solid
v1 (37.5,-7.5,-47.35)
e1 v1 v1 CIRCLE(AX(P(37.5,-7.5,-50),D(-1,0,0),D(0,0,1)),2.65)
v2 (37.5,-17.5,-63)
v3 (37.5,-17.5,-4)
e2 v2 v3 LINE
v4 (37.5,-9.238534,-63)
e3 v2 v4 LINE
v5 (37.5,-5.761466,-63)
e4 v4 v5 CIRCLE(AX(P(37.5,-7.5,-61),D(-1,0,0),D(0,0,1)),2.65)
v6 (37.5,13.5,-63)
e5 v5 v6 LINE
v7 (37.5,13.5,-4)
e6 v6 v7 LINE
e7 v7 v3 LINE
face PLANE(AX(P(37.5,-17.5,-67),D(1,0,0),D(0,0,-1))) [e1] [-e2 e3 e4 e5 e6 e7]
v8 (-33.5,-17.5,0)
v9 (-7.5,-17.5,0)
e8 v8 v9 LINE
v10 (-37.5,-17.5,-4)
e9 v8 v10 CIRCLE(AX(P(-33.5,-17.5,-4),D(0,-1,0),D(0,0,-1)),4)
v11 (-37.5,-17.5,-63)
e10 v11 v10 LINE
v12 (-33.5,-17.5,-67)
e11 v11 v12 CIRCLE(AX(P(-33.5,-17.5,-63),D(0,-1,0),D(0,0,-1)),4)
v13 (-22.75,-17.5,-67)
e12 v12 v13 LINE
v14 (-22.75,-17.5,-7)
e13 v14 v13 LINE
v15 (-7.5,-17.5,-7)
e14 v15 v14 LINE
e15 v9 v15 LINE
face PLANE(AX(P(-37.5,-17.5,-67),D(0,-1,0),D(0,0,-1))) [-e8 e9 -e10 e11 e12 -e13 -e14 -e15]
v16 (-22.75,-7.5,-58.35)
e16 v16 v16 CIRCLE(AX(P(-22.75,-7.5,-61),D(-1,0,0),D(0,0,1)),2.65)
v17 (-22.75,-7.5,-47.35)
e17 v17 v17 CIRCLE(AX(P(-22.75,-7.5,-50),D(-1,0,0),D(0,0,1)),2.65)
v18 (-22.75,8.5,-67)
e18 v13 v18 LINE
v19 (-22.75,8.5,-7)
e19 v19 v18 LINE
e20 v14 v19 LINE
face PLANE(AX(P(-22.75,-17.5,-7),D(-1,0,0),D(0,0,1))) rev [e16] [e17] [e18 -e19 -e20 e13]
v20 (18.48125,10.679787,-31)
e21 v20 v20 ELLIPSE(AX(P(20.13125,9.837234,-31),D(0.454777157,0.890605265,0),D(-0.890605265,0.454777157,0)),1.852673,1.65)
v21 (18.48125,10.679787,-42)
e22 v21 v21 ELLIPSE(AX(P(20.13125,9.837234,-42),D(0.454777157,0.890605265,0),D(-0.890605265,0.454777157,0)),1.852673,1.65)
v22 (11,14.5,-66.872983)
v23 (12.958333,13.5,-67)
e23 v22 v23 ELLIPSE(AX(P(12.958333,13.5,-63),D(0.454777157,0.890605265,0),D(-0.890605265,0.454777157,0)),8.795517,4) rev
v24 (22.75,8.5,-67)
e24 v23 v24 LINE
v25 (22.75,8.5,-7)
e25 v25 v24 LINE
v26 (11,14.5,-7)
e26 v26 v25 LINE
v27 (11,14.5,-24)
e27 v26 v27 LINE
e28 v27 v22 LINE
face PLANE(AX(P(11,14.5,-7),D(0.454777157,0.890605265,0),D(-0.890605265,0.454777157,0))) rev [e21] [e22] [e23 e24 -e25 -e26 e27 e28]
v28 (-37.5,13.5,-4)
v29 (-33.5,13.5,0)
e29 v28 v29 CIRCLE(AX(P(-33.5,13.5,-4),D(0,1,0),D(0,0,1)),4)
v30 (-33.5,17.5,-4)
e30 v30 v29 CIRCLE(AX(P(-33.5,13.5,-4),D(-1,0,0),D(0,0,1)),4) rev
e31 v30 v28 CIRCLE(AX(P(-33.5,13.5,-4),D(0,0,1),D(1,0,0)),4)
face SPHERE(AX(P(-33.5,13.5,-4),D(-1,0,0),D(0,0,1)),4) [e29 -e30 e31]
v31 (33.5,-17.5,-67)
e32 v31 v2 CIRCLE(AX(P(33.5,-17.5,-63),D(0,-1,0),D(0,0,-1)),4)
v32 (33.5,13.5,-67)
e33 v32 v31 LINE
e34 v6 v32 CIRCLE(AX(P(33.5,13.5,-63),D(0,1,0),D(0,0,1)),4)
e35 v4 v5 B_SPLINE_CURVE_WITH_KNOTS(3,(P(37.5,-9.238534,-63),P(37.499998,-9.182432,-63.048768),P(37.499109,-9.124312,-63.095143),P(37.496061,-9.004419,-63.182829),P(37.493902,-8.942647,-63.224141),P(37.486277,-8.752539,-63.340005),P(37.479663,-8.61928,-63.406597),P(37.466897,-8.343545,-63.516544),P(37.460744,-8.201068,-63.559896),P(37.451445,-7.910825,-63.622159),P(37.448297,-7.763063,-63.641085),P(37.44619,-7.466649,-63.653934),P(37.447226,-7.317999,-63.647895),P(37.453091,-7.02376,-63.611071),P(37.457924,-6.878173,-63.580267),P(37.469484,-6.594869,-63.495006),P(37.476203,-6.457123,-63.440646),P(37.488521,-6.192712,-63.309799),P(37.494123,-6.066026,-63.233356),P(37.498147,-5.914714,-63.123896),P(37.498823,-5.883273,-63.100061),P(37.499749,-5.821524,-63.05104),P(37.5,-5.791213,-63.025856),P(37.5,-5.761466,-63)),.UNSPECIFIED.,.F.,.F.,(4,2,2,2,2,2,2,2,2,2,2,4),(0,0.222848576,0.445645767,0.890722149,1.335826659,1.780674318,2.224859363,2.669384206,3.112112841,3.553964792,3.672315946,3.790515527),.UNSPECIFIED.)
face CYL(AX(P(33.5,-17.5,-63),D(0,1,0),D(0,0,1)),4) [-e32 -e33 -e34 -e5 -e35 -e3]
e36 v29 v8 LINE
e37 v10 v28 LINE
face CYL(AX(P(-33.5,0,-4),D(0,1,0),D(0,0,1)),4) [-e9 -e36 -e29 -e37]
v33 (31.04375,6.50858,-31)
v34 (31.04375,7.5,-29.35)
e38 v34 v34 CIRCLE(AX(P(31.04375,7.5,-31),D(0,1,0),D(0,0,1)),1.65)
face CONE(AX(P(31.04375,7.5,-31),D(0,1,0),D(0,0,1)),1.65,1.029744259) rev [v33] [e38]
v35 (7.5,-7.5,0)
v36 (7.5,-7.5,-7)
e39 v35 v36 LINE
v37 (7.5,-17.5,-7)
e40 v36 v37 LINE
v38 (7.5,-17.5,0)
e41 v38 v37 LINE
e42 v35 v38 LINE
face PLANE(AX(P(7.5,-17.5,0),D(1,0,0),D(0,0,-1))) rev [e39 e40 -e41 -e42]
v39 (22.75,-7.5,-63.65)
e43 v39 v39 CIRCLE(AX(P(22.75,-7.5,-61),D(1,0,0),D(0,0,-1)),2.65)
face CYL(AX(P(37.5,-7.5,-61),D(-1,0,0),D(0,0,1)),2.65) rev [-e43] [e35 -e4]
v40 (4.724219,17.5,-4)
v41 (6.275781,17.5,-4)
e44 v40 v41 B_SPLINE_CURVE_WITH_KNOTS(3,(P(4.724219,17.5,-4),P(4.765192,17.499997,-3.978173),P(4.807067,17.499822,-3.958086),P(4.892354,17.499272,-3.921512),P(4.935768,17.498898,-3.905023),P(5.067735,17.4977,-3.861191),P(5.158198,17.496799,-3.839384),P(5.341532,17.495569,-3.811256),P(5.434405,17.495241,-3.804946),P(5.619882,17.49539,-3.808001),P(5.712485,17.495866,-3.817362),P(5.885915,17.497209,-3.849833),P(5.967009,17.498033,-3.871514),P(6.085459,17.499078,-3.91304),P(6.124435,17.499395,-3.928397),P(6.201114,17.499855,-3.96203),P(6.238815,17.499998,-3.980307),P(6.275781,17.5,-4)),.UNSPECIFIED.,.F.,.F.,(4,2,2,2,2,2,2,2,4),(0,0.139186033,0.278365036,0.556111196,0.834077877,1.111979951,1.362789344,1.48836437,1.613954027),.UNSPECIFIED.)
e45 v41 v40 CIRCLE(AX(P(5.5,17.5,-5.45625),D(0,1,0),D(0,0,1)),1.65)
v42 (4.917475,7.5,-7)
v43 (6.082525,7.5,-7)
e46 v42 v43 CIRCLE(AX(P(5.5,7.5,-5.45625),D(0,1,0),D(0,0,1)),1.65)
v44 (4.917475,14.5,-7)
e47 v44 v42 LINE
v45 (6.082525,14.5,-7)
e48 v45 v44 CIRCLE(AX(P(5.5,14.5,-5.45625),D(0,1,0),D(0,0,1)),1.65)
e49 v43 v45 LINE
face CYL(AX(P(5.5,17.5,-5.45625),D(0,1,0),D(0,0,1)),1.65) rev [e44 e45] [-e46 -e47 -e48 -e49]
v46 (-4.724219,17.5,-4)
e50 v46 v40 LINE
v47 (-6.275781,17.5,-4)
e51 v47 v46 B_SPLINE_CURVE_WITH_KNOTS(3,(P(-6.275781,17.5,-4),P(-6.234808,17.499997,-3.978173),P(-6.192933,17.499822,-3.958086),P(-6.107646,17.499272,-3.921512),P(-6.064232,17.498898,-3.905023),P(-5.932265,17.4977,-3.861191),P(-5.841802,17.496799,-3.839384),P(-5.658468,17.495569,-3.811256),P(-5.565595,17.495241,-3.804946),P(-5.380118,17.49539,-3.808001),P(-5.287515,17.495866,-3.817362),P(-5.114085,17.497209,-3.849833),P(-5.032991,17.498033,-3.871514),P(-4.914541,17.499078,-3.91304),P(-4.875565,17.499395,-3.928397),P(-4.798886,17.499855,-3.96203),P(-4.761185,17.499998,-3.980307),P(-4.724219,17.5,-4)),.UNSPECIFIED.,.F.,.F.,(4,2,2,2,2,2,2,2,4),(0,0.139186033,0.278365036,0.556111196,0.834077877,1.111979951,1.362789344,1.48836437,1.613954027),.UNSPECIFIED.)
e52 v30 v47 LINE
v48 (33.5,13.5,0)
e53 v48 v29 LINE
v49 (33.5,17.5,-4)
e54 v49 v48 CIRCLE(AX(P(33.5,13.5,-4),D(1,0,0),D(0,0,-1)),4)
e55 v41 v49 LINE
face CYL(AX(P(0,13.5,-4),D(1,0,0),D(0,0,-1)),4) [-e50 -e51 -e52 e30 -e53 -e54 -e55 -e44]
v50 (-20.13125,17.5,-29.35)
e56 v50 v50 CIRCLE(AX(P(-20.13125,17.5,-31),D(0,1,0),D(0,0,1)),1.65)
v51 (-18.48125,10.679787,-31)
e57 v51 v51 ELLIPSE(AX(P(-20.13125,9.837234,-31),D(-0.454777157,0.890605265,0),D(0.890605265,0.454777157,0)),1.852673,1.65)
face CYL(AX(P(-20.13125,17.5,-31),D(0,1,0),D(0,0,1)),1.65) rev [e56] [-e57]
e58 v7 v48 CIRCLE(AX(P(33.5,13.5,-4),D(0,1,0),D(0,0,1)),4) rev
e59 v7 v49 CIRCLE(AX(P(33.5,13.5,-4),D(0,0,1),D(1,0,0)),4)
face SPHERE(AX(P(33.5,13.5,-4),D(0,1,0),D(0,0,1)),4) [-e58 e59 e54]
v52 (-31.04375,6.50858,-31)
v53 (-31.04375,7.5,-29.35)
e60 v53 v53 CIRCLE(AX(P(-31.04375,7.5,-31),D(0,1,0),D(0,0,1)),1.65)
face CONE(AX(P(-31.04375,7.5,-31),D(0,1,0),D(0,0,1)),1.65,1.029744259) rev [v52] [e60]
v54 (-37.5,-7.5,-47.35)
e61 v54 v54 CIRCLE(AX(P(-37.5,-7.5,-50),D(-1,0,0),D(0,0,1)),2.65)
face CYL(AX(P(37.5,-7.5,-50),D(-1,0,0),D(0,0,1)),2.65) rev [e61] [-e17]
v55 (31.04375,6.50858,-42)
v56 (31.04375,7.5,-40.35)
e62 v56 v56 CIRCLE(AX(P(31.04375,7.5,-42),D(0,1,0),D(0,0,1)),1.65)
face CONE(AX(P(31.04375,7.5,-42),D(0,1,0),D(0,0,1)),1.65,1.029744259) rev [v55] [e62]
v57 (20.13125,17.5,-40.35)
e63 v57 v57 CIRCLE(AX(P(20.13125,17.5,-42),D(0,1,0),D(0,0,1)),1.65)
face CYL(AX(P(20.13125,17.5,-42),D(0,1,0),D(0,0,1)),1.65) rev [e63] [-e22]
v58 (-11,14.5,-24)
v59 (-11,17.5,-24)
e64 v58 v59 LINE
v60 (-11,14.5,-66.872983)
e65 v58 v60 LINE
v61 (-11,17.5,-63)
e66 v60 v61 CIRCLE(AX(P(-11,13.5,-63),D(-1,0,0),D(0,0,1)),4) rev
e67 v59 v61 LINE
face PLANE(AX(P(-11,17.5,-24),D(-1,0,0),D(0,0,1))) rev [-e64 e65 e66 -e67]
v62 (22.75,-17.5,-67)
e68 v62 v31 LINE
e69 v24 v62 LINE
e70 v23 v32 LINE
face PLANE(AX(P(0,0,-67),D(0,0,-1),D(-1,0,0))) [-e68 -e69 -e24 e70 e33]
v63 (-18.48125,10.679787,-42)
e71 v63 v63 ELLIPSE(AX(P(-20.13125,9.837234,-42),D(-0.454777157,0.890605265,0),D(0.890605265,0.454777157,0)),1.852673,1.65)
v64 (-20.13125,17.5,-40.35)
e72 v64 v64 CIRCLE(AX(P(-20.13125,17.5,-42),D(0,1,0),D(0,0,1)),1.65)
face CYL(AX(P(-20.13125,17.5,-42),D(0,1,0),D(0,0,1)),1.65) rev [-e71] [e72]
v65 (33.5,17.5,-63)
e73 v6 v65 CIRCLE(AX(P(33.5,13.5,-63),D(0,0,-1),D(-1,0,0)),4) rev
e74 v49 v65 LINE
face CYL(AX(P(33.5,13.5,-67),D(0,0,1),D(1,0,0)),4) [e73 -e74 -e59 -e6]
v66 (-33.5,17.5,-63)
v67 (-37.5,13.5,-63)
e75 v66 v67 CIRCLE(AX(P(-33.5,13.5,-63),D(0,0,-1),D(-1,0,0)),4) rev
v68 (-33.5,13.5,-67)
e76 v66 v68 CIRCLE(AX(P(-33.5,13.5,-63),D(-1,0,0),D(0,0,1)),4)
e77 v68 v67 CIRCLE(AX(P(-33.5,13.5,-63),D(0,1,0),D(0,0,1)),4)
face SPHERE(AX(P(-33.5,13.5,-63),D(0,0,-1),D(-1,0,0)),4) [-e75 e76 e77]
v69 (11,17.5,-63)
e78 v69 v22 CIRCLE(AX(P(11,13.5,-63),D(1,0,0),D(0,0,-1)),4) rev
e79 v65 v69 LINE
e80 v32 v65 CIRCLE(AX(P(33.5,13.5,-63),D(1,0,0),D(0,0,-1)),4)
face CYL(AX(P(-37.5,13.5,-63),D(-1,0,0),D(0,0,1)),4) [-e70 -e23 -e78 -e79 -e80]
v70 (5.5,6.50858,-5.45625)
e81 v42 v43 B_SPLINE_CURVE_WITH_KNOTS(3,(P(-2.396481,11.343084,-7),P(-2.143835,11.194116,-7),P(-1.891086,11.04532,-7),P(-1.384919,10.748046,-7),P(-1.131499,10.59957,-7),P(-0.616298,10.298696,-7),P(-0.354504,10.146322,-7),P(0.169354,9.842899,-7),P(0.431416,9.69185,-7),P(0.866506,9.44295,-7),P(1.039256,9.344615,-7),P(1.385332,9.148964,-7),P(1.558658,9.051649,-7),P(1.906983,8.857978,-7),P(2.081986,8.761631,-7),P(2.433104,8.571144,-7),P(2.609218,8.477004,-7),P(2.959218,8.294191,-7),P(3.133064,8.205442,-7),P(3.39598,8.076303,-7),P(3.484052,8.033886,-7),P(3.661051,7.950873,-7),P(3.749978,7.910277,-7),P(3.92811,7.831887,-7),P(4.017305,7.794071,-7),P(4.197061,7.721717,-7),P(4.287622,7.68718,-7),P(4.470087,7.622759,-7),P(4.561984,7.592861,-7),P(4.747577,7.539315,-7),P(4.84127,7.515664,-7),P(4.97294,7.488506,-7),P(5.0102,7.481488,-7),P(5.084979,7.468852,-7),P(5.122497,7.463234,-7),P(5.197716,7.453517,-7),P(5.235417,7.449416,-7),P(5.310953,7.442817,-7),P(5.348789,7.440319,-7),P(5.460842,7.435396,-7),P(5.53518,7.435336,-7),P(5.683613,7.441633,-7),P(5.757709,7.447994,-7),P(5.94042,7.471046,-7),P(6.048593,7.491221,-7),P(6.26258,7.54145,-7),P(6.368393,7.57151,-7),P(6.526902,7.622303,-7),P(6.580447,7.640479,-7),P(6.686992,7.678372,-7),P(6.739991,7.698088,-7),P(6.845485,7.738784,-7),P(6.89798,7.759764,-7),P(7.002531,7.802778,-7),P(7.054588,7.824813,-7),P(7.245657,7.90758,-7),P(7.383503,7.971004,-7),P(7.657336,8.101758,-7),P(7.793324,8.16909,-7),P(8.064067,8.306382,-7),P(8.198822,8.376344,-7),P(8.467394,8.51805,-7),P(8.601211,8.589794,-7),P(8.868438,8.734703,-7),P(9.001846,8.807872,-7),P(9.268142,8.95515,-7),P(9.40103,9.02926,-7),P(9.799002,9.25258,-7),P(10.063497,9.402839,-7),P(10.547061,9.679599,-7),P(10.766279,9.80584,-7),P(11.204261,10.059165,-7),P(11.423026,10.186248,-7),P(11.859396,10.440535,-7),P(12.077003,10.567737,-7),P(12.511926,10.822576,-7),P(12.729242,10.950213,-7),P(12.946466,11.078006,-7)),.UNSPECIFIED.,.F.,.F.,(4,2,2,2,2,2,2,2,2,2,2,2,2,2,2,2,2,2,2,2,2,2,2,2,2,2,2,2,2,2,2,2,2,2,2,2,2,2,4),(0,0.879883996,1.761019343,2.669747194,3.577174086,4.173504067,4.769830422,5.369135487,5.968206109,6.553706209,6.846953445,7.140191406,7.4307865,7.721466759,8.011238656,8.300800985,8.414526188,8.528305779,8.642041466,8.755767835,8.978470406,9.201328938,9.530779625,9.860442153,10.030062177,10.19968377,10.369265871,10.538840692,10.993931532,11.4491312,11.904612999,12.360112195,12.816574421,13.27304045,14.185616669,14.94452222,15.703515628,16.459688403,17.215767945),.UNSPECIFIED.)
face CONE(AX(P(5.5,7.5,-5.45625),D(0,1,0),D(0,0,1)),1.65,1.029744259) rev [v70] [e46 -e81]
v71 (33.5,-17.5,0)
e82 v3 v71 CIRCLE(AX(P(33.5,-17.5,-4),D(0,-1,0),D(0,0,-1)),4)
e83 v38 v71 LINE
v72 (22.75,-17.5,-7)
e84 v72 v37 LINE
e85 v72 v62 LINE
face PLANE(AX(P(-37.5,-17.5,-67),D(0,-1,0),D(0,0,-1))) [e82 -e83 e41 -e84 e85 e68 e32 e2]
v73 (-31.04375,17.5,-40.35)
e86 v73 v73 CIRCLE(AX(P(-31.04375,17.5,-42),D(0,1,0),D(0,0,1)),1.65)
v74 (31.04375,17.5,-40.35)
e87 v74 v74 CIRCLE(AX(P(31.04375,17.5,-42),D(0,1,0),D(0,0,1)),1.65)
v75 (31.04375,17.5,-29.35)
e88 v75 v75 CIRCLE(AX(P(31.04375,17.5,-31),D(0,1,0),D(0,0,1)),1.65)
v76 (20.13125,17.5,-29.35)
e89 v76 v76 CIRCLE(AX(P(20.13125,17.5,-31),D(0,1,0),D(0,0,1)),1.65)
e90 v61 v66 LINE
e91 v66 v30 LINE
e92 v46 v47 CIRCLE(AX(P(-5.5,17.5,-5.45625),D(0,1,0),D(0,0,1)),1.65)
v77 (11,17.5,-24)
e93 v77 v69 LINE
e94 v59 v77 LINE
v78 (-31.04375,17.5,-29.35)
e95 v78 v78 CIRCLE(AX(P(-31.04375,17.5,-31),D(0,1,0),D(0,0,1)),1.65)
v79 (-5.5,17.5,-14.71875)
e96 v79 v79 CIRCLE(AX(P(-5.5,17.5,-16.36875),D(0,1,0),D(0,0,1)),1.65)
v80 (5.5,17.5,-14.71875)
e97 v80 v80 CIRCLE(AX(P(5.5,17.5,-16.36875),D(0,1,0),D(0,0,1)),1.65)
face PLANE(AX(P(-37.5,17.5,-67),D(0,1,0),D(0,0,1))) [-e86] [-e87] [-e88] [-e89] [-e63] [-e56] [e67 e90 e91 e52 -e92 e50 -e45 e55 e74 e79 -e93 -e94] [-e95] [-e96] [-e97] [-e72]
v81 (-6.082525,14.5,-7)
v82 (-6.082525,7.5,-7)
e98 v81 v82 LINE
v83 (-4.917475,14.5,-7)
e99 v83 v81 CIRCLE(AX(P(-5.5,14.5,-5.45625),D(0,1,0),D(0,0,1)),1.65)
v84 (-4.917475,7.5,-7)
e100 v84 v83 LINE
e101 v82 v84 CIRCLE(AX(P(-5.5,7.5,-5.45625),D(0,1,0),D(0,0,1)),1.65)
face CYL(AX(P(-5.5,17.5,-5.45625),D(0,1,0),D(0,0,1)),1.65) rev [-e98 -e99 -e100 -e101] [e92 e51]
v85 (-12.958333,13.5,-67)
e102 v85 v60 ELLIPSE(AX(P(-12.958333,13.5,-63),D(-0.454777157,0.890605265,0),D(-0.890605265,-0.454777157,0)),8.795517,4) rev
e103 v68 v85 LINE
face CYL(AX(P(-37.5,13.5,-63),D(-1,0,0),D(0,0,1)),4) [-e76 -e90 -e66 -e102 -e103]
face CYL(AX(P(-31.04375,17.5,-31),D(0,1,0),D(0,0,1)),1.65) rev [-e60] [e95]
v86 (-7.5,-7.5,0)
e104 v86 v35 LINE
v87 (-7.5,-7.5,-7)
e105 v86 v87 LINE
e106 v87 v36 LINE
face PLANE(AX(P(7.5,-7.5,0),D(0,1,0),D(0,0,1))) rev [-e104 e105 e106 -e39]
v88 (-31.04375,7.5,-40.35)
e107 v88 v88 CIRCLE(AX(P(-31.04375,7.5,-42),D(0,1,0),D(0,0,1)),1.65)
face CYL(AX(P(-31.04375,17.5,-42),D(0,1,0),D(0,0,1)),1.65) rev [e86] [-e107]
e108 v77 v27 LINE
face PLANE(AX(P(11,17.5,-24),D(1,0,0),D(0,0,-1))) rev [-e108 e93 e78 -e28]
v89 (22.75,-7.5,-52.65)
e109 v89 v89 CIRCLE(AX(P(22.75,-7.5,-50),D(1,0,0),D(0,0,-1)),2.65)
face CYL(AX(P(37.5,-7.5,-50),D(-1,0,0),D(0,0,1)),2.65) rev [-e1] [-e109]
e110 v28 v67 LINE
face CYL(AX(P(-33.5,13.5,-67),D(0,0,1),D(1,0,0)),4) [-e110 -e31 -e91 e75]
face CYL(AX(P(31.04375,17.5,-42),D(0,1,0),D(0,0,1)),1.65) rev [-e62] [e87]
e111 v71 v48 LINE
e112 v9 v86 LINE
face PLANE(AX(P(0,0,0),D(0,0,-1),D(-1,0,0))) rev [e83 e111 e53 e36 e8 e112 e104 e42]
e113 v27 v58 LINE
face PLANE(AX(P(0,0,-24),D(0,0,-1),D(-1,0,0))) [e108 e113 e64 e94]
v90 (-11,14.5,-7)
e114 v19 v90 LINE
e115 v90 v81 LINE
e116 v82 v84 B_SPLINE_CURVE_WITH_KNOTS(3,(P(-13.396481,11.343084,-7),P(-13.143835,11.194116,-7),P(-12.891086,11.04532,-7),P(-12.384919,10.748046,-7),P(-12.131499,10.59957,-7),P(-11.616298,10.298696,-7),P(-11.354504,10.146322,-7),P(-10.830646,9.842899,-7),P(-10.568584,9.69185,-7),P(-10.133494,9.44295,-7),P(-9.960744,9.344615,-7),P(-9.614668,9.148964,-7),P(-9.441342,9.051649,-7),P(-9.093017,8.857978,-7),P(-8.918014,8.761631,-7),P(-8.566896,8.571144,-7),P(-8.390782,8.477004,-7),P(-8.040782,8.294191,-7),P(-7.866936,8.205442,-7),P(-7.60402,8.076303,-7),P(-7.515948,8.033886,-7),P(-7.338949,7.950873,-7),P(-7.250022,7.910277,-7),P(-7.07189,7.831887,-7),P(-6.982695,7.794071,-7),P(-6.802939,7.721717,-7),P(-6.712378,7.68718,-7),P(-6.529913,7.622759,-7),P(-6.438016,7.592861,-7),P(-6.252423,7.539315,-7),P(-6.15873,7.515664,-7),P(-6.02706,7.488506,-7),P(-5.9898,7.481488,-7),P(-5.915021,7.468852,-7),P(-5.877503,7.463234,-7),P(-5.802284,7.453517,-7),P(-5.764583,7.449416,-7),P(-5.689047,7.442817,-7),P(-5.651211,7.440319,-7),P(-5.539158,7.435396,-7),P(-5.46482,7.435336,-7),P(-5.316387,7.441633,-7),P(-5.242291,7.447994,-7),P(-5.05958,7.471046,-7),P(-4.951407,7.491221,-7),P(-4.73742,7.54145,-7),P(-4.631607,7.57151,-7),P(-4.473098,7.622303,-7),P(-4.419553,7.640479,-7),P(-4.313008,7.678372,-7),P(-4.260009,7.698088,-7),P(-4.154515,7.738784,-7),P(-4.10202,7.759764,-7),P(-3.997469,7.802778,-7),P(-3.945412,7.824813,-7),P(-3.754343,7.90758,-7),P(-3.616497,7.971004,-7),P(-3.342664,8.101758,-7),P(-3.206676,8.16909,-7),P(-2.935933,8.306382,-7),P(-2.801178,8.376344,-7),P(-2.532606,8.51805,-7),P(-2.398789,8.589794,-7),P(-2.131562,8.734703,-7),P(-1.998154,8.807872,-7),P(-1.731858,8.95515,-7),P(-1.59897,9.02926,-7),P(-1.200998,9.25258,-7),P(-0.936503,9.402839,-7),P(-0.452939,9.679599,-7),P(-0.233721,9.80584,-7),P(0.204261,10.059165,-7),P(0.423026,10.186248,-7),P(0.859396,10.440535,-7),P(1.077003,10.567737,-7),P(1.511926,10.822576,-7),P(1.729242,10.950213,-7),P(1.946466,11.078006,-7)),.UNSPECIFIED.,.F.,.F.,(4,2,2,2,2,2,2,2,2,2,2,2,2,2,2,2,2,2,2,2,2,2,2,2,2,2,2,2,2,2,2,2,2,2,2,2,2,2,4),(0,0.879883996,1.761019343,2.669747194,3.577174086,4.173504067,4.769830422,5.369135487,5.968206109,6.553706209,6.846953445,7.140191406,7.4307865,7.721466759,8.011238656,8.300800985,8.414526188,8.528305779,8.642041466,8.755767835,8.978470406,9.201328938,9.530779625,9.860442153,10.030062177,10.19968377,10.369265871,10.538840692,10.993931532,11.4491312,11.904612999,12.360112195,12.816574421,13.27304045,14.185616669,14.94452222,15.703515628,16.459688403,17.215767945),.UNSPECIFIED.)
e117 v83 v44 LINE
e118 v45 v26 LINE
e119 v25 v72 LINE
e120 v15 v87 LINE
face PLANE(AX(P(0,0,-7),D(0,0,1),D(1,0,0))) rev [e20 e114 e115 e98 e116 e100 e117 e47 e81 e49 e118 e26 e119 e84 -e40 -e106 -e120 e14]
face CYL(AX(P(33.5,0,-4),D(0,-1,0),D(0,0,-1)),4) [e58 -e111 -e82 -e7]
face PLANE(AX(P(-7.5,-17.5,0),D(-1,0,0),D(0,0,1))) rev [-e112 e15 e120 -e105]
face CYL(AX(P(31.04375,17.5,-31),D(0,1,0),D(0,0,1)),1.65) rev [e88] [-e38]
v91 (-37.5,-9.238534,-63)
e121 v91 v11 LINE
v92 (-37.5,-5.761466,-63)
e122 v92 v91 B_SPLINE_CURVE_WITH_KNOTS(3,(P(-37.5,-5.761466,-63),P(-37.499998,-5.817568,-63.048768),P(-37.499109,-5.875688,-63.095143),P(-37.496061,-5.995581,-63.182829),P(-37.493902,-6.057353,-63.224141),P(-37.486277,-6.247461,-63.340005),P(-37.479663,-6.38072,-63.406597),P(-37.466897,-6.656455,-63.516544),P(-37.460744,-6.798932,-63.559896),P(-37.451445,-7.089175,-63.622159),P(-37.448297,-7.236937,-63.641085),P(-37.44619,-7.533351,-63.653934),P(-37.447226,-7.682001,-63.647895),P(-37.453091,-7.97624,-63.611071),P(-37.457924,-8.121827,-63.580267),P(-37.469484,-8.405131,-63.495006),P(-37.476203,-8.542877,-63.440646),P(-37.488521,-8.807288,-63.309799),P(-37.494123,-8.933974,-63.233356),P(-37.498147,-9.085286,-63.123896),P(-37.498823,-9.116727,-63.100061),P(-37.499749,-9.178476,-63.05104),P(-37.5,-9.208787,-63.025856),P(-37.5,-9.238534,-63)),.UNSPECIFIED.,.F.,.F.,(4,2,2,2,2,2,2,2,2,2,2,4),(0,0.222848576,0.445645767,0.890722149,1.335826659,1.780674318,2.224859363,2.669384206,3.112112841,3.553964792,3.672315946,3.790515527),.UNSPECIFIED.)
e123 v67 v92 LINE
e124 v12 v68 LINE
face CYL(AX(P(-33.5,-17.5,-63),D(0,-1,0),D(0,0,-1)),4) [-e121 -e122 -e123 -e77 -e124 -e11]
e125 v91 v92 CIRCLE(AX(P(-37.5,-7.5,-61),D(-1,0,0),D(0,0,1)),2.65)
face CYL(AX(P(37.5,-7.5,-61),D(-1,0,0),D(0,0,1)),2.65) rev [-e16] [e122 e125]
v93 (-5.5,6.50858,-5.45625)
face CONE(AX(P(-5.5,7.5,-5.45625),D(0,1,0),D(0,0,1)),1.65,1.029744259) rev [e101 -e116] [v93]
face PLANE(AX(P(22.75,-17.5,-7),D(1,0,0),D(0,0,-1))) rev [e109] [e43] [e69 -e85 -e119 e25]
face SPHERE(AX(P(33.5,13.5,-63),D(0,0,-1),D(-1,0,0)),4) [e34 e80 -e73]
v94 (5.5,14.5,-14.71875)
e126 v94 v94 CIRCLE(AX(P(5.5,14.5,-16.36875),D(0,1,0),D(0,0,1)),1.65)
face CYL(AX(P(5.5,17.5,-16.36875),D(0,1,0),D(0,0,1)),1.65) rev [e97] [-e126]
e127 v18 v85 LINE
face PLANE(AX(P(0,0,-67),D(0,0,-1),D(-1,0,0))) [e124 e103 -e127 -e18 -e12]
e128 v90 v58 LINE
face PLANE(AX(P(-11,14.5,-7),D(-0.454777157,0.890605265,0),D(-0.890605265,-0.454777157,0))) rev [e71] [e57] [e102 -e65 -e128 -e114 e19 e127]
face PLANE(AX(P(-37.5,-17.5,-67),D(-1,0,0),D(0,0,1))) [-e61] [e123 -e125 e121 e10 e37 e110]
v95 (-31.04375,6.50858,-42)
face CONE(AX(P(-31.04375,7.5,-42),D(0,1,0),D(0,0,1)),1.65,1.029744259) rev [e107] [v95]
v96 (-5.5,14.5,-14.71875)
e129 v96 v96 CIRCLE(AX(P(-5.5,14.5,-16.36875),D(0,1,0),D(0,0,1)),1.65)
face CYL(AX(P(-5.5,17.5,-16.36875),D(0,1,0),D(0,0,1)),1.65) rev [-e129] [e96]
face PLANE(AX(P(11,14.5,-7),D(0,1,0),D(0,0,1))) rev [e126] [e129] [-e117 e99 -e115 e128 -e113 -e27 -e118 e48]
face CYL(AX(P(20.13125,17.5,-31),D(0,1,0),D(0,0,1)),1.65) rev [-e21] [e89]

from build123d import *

# Parameters (mm, degrees)
SKETCH1_W                 = 75
SKETCH1_H                 = 35
BOSS_EXTRUDE1_DEPTH       = 67
CUT_EXTRUDE1_DEPTH        = 60
SKETCH4_W                 = 15
SKETCH4_H                 = 10
CUT_EXTRUDE2_DEPTH        = 73.886898686
SKETCH5_W                 = 22
SKETCH5_H                 = 3
CUT_EXTRUDE3_DEPTH        = 43
F_3_0MM_DOWEL_HOLE1_D     = 3.3
F_3_0MM_DOWEL_HOLE1_DEPTH = 10
F_3_0MM_DOWEL_HOLE1_TIP   = 0.991420021
SKETCH8_R                 = 2.65
CUT_EXTRUDE4_DEPTH        = 103.079625783
FILLET1_R                 = 4


with BuildPart() as part:
    # Sketch1 → Boss-Extrude1 (new body)
    with BuildSketch(Plane.XY):
        Rectangle(SKETCH1_W, SKETCH1_H)
    extrude(amount=-BOSS_EXTRUDE1_DEPTH)

    # Sketch2 → Cut-Extrude1 (cut)
    with BuildSketch(Plane(origin=(0, 0, -67), x_dir=(-1, 0, 0), z_dir=(0, 0, -1))):
        Polygon((-22.75, -17.5), (22.75, -17.5), (22.75, 8.5), (11, 14.5), (-11, 14.5), (-22.75, 8.5), align=None)
    extrude(amount=-CUT_EXTRUDE1_DEPTH, mode=Mode.SUBTRACT)

    # Sketch4 → Cut-Extrude2 (cut, through all)
    with BuildSketch(Plane(origin=(0, 0, -7), x_dir=(-1, 0, 0), z_dir=(0, 0, -1))):
        with Locations((0, -12.5)):
            Rectangle(SKETCH4_W, SKETCH4_H)
    extrude(amount=-CUT_EXTRUDE2_DEPTH, mode=Mode.SUBTRACT)

    # Sketch5 → Cut-Extrude3 (cut)
    with BuildSketch(Plane(origin=(0, 0, -67), x_dir=(-1, 0, 0), z_dir=(0, 0, -1))):
        with Locations((0, 16)):
            Rectangle(SKETCH5_W, SKETCH5_H)
    extrude(amount=-CUT_EXTRUDE3_DEPTH, mode=Mode.SUBTRACT)

    # Ø3.0mm Dowel Hole1
    with Locations(Plane(origin=(0, 17.5, 0), x_dir=(1, 0, 0), z_dir=(0, 1, 0))):
        with Locations((-31.04375, 31), (-31.04375, 42), (-20.13125, 42), (-20.13125, 31), (-5.5, 16.36875), (5.5, 16.36875), (-5.5, 5.45625), (5.5, 5.45625), (31.04375, 42), (20.13125, 42), (31.04375, 31), (20.13125, 31)):
            Hole(F_3_0MM_DOWEL_HOLE1_D / 2, depth=F_3_0MM_DOWEL_HOLE1_DEPTH)
            with Locations((0, 0, -(F_3_0MM_DOWEL_HOLE1_DEPTH + F_3_0MM_DOWEL_HOLE1_TIP / 2))):  # 118° drill point
                Cone(0, F_3_0MM_DOWEL_HOLE1_D / 2, F_3_0MM_DOWEL_HOLE1_TIP, mode=Mode.SUBTRACT)

    # Sketch8 → Cut-Extrude4 (cut, through all)
    with BuildSketch(Plane.ZY.offset(37.5)):
        with Locations((-61, -7.5)):
            Circle(SKETCH8_R)
        with Locations((-50, -7.5)):
            Circle(SKETCH8_R)
    extrude(amount=-CUT_EXTRUDE4_DEPTH, mode=Mode.SUBTRACT)

    # Fillet1
    # the kernel refuses this fillet: 4 mm, written as the material it takes off along each edge
    with BuildSketch(Plane(origin=(33.5, 13.5, -4), x_dir=(0, 0, 1), z_dir=(1, 0, 0))) as fillet1_piece_1_section:
        Polygon((0, 0), (FILLET1_R, 0), (FILLET1_R, -FILLET1_R), (0, -FILLET1_R), align=None)
    fillet1_piece_1 = extrude(amount=FILLET1_R, mode=Mode.PRIVATE)
    fillet1_piece_1 = fillet1_piece_1 - Plane(origin=(33.5, 13.5, -4), x_dir=(0, -0.7071067811865475, -0.7071067811865475), z_dir=(1, 0, 0)) * Sphere(FILLET1_R, mode=Mode.PRIVATE)
    add(fillet1_piece_1, mode=Mode.SUBTRACT)
    with BuildSketch(Plane(origin=(-33.5, 13.5, -4), x_dir=(-1, 0, 0), z_dir=(0, 0, 1))) as fillet1_piece_2_section:
        Polygon((0, 0), (FILLET1_R, 0), (FILLET1_R, -FILLET1_R), (0, -FILLET1_R), align=None)
    fillet1_piece_2 = extrude(amount=FILLET1_R, mode=Mode.PRIVATE)
    fillet1_piece_2 = fillet1_piece_2 - Plane(origin=(-33.5, 13.5, -4), x_dir=(0.7071067811865475, -0.7071067811865475, 0), z_dir=(0, 0, 1)) * Sphere(FILLET1_R, mode=Mode.PRIVATE)
    add(fillet1_piece_2, mode=Mode.SUBTRACT)
    with BuildSketch(Plane(origin=(-33.5, 13.5, -63), x_dir=(-1, 0, 0), z_dir=(0, 0, -1))) as fillet1_piece_3_section:
        Polygon((0, 0), (FILLET1_R, 0), (FILLET1_R, FILLET1_R), (0, FILLET1_R), align=None)
    fillet1_piece_3 = extrude(amount=FILLET1_R, mode=Mode.PRIVATE)
    fillet1_piece_3 = fillet1_piece_3 - Plane(origin=(-33.5, 13.5, -63), x_dir=(0.7071067811865475, -0.7071067811865475, 0), z_dir=(0, 0, -1)) * Sphere(FILLET1_R, mode=Mode.PRIVATE)
    add(fillet1_piece_3, mode=Mode.SUBTRACT)
    with BuildSketch(Plane(origin=(33.5, 13.5, -63), x_dir=(0, 1, 0), z_dir=(1, 0, 0))) as fillet1_piece_4_section:
        Polygon((0, 0), (FILLET1_R, 0), (FILLET1_R, -FILLET1_R), (0, -FILLET1_R), align=None)
    fillet1_piece_4 = extrude(amount=FILLET1_R, mode=Mode.PRIVATE)
    fillet1_piece_4 = fillet1_piece_4 - Plane(origin=(33.5, 13.5, -63), x_dir=(0, -0.7071067811865475, 0.7071067811865475), z_dir=(1, 0, 0)) * Sphere(FILLET1_R, mode=Mode.PRIVATE)
    add(fillet1_piece_4, mode=Mode.SUBTRACT)
    with BuildSketch(Plane(origin=(37.5, -27.5, 0), x_dir=(-1, 0, 0), z_dir=(0, 1, 0)), Plane(origin=(-37.5, 13.5, 0), x_dir=(1, 0, 0), z_dir=(0, -1, 0)), Plane(origin=(37.5, -27.5, -67), x_dir=(0, 0, 1), z_dir=(0, 1, 0))) as fillet1_piece_5:
        with BuildLine():
            CenterArc((FILLET1_R, -FILLET1_R), FILLET1_R, 90, 90)
            Line((0, -FILLET1_R), (0, 0))
            Line((0, 0), (FILLET1_R, 0))
        make_face()
    extrude(amount=41, mode=Mode.SUBTRACT)
    with BuildSketch(Plane(origin=(-37.5, 13.5, -67), x_dir=(1, 0, 0), z_dir=(0, -1, 0))) as fillet1_piece_6:
        with BuildLine():
            CenterArc((FILLET1_R, FILLET1_R), FILLET1_R, 180, 90)
            Line((0, FILLET1_R), (0, 0))
            Line((0, 0), (FILLET1_R, 0))
        make_face()
    extrude(amount=41, mode=Mode.SUBTRACT)
    with BuildSketch(Plane(origin=(-1, 17.5, -67), x_dir=(0, -1, 0), z_dir=(-1, 0, 0))) as fillet1_piece_7:
        with BuildLine():
            CenterArc((FILLET1_R, FILLET1_R), FILLET1_R, 180, 90)
            Line((0, FILLET1_R), (0, 0))
            Line((0, 0), (FILLET1_R, 0))
        make_face()
    extrude(amount=32.5, mode=Mode.SUBTRACT)
    with BuildSketch(Plane(origin=(33.5, 17.5, -67), x_dir=(0, 0, 1), z_dir=(-1, 0, 0))) as fillet1_piece_8:
        with BuildLine():
            CenterArc((FILLET1_R, -FILLET1_R), FILLET1_R, 90, 90)
            Line((0, -FILLET1_R), (0, 0))
            Line((0, 0), (FILLET1_R, 0))
        make_face()
    extrude(amount=32.5, mode=Mode.SUBTRACT)
    with BuildSketch(Plane(origin=(37.5, 17.5, -4), x_dir=(-1, 0, 0), z_dir=(0, 0, -1)), Plane(origin=(-37.5, 17.5, -4), x_dir=(0, -1, 0), z_dir=(0, 0, -1))) as fillet1_piece_9:
        with BuildLine():
            CenterArc((FILLET1_R, -FILLET1_R), FILLET1_R, 90, 90)
            Line((0, -FILLET1_R), (0, 0))
            Line((0, 0), (FILLET1_R, 0))
        make_face()
    extrude(amount=59, mode=Mode.SUBTRACT)
    with BuildSketch(Plane(origin=(33.5, 17.5, 0), x_dir=(0, -1, 0), z_dir=(-1, 0, 0))) as fillet1_piece_10:
        with BuildLine():
            CenterArc((FILLET1_R, -FILLET1_R), FILLET1_R, 90, 90)
            Line((0, -FILLET1_R), (0, 0))
            Line((0, 0), (FILLET1_R, 0))
        make_face()
    extrude(amount=67, mode=Mode.SUBTRACT)


solid = part.part
